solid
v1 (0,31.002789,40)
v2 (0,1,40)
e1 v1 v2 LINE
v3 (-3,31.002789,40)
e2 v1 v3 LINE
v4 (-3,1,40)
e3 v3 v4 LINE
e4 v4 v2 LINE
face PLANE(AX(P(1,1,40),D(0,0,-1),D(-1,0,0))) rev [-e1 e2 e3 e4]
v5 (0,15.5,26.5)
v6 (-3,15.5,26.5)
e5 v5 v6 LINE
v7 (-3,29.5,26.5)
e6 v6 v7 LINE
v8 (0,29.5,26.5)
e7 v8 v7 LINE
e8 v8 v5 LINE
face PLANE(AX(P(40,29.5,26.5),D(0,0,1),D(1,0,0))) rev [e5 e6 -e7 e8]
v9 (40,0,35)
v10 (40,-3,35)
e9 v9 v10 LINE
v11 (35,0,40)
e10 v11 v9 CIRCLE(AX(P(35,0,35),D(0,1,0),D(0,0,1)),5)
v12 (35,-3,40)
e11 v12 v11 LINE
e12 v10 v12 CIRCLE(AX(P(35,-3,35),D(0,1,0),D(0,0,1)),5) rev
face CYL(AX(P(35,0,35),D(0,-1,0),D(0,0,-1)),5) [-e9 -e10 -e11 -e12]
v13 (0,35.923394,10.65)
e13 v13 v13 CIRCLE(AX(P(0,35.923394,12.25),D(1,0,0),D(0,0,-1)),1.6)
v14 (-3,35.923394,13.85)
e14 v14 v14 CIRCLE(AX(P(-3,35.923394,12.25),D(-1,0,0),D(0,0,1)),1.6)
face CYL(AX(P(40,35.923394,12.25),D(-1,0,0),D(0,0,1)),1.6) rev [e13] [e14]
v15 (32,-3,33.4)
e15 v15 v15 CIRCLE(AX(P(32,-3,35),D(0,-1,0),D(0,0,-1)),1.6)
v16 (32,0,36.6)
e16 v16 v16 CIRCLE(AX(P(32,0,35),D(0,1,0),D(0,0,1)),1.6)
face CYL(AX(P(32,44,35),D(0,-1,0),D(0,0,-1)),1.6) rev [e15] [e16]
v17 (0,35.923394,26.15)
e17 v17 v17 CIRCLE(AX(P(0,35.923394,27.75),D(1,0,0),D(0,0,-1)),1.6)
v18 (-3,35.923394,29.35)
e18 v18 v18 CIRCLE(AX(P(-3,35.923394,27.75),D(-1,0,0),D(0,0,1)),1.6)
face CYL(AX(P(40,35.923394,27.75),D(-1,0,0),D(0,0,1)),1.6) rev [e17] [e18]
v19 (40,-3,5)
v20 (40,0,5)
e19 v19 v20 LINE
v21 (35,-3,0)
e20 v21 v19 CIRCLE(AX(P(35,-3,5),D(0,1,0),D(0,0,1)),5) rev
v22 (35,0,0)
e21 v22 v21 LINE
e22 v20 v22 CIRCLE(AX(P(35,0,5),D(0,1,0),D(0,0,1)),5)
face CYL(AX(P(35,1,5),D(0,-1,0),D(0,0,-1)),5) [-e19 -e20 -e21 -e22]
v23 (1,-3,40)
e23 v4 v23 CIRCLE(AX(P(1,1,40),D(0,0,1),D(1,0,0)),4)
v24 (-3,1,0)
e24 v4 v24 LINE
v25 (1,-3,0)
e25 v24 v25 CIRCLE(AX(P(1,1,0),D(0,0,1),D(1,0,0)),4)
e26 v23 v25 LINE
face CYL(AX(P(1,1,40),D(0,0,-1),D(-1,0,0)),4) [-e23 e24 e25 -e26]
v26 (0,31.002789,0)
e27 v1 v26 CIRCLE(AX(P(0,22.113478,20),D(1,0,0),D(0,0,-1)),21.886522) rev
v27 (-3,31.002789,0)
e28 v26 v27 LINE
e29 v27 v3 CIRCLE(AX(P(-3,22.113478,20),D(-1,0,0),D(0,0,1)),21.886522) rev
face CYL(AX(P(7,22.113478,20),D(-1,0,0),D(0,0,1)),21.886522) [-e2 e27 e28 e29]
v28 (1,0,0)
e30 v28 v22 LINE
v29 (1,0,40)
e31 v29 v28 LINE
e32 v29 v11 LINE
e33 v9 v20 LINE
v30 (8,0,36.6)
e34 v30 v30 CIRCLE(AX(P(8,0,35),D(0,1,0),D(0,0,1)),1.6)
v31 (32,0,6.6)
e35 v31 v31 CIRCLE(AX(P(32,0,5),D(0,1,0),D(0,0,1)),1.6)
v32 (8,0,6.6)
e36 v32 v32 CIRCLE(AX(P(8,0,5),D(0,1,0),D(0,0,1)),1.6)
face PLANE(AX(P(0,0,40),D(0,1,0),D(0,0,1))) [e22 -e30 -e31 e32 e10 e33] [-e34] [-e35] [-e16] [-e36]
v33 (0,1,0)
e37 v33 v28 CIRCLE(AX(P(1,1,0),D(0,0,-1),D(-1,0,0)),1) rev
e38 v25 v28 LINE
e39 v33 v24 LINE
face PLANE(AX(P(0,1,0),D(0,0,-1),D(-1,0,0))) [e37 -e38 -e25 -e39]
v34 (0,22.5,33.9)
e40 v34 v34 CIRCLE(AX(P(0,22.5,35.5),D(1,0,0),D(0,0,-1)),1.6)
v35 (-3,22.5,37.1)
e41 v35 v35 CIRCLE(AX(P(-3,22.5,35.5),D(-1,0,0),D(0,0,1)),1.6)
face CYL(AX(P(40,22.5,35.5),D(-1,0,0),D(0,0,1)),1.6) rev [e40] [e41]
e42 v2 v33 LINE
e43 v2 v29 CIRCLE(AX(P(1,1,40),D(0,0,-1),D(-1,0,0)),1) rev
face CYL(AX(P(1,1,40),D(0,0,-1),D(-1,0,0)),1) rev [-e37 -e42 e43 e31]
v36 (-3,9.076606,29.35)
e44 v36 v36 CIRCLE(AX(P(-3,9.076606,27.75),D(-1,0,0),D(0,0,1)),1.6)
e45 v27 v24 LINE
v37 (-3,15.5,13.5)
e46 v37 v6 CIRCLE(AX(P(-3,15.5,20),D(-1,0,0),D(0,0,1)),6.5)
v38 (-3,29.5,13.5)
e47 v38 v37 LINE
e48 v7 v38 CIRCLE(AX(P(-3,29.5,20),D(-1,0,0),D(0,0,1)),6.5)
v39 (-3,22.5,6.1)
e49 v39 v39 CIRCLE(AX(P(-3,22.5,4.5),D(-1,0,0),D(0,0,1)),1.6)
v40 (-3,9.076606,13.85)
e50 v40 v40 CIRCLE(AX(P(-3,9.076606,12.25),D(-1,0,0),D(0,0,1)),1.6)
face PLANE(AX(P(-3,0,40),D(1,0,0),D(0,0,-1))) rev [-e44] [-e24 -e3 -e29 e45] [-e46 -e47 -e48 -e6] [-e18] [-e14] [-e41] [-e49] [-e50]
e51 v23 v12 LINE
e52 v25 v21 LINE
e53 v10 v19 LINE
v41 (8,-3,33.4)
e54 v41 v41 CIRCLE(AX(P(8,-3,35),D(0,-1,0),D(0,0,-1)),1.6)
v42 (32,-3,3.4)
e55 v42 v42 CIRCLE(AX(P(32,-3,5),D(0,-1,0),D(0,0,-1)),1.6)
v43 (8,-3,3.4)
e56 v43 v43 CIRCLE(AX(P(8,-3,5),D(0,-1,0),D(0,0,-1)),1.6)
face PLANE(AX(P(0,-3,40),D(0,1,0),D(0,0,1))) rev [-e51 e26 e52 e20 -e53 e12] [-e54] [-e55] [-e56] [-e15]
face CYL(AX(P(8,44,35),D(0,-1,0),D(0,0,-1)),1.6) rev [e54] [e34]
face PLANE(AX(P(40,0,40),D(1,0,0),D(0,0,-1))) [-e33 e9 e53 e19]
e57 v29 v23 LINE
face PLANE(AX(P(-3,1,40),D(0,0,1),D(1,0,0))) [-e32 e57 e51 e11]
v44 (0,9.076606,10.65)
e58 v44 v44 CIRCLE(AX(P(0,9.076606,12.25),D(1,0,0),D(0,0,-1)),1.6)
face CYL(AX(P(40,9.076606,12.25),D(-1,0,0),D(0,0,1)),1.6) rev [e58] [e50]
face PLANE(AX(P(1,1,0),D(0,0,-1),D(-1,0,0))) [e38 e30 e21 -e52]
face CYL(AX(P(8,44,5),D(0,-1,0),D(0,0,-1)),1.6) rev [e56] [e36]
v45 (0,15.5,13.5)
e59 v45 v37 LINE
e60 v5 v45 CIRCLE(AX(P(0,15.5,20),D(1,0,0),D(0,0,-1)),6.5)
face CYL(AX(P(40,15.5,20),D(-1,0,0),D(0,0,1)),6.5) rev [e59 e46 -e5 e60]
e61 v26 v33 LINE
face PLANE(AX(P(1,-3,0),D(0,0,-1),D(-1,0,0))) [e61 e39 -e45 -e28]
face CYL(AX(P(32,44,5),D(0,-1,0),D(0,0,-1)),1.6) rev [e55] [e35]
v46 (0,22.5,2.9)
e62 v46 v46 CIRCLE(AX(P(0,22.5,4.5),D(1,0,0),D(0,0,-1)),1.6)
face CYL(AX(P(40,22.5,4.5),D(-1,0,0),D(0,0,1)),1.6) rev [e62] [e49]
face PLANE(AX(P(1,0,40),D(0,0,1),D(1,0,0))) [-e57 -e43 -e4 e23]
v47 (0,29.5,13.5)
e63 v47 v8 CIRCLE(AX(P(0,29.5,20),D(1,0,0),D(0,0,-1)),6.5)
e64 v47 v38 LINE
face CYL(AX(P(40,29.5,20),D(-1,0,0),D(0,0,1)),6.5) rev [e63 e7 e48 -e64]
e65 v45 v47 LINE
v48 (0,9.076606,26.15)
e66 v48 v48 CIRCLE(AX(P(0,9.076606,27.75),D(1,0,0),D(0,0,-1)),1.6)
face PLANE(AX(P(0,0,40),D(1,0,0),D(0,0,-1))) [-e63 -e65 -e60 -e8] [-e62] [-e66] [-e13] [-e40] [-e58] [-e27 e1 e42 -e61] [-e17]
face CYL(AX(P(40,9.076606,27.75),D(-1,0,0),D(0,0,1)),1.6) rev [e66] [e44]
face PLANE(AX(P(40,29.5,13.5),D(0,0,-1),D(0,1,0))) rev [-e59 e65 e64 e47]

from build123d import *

# Parameters (mm, degrees)
SM_BASE_FLANGE_1_DEPTH      = 40
CUT_EXTRUDE_3_DEPTH         = 10
CUT_EXTRUDE_1_DEPTH         = 74.382559236
SKETCH_7_R                  = 1.6
CUT_EXTRUDE_2_DEPTH         = 74.382559236
SKETCH_9_R                  = 1.6
CUT_EXTRUDE_4_DEPTH         = 74.545904033
PATTERN_LINEAR_1_COUNT      = 2
PATTERN_LINEAR_1_PITCH      = 30
PATTERN_LINEAR_1_COUNT_DIR2 = 2
PATTERN_LINEAR_1_PITCH_DIR2 = 24
FILLET_1_R                  = 5


# Sheet-metal steps are written as plain solids
with BuildPart() as part:
    # Sketch 1 → 基材-凸緣1 (new body)
    with BuildSketch(Plane.XY):
        with BuildLine():
            Line((40, 0), (1, 0))
            ThreePointArc((1, 0), (0.292893219, 0.292893219), (0, 1))
            Line((0, 1), (0, 44))
            Line((0, 44), (-3, 44))
            Line((-3, 44), (-3, 1))
            ThreePointArc((-3, 1), (-1.828427125, -1.828427125), (1, -3))
            Line((1, -3), (40, -3))
            Line((40, -3), (40, 0))
        make_face()
    extrude(amount=SM_BASE_FLANGE_1_DEPTH)

    # 草圖8 → 除料-伸長3 (cut)
    with BuildSketch(Plane.ZY.offset(3)):
        with BuildLine():
            Line((0, 44), (0, 31.002788981))
            ThreePointArc((0, 31.002788981), (8.073899482, 40.465261916), (20, 44))
            Line((20, 44), (0, 44))
        make_face()
        with BuildLine():
            ThreePointArc((20, 44), (31.926100518, 40.465261916), (40, 31.002788981))
            Line((40, 31.002788981), (40, 44))
            Line((40, 44), (20, 44))
        make_face()
    extrude(amount=-CUT_EXTRUDE_3_DEPTH, mode=Mode.SUBTRACT)

    # 草圖6 → 除料-伸長1 (cut, through all)
    with BuildSketch(Plane.ZY.offset(3)):
        with BuildLine():
            Line((26.5, 29.5), (26.5, 15.5))
            ThreePointArc((26.5, 15.5), (20, 9), (13.5, 15.5))
            Line((13.5, 15.5), (13.5, 29.5))
            ThreePointArc((13.5, 29.5), (20, 36), (26.5, 29.5))
        make_face()
    extrude(amount=-CUT_EXTRUDE_1_DEPTH, mode=Mode.SUBTRACT)

    # 草圖7 → 除料-伸長2 (cut, through all)
    with BuildSketch(Plane.ZY.offset(3)):
        with Locations((4.5, 22.5)):
            Circle(SKETCH_7_R)
        with Locations((12.25, 9.076606241)):
            Circle(SKETCH_7_R)
        with Locations((27.75, 9.076606241)):
            Circle(SKETCH_7_R)
        with Locations((35.5, 22.5)):
            Circle(SKETCH_7_R)
        with Locations((27.75, 35.923393759)):
            Circle(SKETCH_7_R)
        with Locations((12.25, 35.923393759)):
            Circle(SKETCH_7_R)
    extrude(amount=-CUT_EXTRUDE_2_DEPTH, mode=Mode.SUBTRACT)

    # 草圖9 → 除料-伸長4 (cut, through all)
    with BuildSketch(Plane.XZ.offset(3)):
        with Locations(Location((32, 35, 0), (0, 0, 270))):
            Circle(SKETCH_9_R)
    cut_extrude_4 = extrude(amount=-CUT_EXTRUDE_4_DEPTH, mode=Mode.SUBTRACT)

    # 直線複製排列1: Cut-Extrude 4 2 × 2
    with Locations(*[(-j * PATTERN_LINEAR_1_PITCH_DIR2, 0, -i * PATTERN_LINEAR_1_PITCH) for i in range(PATTERN_LINEAR_1_COUNT) for j in range(PATTERN_LINEAR_1_COUNT_DIR2) if (i, j) != (0, 0)]):
        add(cut_extrude_4, mode=Mode.SUBTRACT)

    # 圓角1
    fillet_1_edges = [part.edges().sort_by_distance(p)[0] for p in [
        (40, -1.5, 40),
        (40, -1.5, 0),
    ]]
    fillet(fillet_1_edges, radius=FILLET_1_R)


solid = part.part
